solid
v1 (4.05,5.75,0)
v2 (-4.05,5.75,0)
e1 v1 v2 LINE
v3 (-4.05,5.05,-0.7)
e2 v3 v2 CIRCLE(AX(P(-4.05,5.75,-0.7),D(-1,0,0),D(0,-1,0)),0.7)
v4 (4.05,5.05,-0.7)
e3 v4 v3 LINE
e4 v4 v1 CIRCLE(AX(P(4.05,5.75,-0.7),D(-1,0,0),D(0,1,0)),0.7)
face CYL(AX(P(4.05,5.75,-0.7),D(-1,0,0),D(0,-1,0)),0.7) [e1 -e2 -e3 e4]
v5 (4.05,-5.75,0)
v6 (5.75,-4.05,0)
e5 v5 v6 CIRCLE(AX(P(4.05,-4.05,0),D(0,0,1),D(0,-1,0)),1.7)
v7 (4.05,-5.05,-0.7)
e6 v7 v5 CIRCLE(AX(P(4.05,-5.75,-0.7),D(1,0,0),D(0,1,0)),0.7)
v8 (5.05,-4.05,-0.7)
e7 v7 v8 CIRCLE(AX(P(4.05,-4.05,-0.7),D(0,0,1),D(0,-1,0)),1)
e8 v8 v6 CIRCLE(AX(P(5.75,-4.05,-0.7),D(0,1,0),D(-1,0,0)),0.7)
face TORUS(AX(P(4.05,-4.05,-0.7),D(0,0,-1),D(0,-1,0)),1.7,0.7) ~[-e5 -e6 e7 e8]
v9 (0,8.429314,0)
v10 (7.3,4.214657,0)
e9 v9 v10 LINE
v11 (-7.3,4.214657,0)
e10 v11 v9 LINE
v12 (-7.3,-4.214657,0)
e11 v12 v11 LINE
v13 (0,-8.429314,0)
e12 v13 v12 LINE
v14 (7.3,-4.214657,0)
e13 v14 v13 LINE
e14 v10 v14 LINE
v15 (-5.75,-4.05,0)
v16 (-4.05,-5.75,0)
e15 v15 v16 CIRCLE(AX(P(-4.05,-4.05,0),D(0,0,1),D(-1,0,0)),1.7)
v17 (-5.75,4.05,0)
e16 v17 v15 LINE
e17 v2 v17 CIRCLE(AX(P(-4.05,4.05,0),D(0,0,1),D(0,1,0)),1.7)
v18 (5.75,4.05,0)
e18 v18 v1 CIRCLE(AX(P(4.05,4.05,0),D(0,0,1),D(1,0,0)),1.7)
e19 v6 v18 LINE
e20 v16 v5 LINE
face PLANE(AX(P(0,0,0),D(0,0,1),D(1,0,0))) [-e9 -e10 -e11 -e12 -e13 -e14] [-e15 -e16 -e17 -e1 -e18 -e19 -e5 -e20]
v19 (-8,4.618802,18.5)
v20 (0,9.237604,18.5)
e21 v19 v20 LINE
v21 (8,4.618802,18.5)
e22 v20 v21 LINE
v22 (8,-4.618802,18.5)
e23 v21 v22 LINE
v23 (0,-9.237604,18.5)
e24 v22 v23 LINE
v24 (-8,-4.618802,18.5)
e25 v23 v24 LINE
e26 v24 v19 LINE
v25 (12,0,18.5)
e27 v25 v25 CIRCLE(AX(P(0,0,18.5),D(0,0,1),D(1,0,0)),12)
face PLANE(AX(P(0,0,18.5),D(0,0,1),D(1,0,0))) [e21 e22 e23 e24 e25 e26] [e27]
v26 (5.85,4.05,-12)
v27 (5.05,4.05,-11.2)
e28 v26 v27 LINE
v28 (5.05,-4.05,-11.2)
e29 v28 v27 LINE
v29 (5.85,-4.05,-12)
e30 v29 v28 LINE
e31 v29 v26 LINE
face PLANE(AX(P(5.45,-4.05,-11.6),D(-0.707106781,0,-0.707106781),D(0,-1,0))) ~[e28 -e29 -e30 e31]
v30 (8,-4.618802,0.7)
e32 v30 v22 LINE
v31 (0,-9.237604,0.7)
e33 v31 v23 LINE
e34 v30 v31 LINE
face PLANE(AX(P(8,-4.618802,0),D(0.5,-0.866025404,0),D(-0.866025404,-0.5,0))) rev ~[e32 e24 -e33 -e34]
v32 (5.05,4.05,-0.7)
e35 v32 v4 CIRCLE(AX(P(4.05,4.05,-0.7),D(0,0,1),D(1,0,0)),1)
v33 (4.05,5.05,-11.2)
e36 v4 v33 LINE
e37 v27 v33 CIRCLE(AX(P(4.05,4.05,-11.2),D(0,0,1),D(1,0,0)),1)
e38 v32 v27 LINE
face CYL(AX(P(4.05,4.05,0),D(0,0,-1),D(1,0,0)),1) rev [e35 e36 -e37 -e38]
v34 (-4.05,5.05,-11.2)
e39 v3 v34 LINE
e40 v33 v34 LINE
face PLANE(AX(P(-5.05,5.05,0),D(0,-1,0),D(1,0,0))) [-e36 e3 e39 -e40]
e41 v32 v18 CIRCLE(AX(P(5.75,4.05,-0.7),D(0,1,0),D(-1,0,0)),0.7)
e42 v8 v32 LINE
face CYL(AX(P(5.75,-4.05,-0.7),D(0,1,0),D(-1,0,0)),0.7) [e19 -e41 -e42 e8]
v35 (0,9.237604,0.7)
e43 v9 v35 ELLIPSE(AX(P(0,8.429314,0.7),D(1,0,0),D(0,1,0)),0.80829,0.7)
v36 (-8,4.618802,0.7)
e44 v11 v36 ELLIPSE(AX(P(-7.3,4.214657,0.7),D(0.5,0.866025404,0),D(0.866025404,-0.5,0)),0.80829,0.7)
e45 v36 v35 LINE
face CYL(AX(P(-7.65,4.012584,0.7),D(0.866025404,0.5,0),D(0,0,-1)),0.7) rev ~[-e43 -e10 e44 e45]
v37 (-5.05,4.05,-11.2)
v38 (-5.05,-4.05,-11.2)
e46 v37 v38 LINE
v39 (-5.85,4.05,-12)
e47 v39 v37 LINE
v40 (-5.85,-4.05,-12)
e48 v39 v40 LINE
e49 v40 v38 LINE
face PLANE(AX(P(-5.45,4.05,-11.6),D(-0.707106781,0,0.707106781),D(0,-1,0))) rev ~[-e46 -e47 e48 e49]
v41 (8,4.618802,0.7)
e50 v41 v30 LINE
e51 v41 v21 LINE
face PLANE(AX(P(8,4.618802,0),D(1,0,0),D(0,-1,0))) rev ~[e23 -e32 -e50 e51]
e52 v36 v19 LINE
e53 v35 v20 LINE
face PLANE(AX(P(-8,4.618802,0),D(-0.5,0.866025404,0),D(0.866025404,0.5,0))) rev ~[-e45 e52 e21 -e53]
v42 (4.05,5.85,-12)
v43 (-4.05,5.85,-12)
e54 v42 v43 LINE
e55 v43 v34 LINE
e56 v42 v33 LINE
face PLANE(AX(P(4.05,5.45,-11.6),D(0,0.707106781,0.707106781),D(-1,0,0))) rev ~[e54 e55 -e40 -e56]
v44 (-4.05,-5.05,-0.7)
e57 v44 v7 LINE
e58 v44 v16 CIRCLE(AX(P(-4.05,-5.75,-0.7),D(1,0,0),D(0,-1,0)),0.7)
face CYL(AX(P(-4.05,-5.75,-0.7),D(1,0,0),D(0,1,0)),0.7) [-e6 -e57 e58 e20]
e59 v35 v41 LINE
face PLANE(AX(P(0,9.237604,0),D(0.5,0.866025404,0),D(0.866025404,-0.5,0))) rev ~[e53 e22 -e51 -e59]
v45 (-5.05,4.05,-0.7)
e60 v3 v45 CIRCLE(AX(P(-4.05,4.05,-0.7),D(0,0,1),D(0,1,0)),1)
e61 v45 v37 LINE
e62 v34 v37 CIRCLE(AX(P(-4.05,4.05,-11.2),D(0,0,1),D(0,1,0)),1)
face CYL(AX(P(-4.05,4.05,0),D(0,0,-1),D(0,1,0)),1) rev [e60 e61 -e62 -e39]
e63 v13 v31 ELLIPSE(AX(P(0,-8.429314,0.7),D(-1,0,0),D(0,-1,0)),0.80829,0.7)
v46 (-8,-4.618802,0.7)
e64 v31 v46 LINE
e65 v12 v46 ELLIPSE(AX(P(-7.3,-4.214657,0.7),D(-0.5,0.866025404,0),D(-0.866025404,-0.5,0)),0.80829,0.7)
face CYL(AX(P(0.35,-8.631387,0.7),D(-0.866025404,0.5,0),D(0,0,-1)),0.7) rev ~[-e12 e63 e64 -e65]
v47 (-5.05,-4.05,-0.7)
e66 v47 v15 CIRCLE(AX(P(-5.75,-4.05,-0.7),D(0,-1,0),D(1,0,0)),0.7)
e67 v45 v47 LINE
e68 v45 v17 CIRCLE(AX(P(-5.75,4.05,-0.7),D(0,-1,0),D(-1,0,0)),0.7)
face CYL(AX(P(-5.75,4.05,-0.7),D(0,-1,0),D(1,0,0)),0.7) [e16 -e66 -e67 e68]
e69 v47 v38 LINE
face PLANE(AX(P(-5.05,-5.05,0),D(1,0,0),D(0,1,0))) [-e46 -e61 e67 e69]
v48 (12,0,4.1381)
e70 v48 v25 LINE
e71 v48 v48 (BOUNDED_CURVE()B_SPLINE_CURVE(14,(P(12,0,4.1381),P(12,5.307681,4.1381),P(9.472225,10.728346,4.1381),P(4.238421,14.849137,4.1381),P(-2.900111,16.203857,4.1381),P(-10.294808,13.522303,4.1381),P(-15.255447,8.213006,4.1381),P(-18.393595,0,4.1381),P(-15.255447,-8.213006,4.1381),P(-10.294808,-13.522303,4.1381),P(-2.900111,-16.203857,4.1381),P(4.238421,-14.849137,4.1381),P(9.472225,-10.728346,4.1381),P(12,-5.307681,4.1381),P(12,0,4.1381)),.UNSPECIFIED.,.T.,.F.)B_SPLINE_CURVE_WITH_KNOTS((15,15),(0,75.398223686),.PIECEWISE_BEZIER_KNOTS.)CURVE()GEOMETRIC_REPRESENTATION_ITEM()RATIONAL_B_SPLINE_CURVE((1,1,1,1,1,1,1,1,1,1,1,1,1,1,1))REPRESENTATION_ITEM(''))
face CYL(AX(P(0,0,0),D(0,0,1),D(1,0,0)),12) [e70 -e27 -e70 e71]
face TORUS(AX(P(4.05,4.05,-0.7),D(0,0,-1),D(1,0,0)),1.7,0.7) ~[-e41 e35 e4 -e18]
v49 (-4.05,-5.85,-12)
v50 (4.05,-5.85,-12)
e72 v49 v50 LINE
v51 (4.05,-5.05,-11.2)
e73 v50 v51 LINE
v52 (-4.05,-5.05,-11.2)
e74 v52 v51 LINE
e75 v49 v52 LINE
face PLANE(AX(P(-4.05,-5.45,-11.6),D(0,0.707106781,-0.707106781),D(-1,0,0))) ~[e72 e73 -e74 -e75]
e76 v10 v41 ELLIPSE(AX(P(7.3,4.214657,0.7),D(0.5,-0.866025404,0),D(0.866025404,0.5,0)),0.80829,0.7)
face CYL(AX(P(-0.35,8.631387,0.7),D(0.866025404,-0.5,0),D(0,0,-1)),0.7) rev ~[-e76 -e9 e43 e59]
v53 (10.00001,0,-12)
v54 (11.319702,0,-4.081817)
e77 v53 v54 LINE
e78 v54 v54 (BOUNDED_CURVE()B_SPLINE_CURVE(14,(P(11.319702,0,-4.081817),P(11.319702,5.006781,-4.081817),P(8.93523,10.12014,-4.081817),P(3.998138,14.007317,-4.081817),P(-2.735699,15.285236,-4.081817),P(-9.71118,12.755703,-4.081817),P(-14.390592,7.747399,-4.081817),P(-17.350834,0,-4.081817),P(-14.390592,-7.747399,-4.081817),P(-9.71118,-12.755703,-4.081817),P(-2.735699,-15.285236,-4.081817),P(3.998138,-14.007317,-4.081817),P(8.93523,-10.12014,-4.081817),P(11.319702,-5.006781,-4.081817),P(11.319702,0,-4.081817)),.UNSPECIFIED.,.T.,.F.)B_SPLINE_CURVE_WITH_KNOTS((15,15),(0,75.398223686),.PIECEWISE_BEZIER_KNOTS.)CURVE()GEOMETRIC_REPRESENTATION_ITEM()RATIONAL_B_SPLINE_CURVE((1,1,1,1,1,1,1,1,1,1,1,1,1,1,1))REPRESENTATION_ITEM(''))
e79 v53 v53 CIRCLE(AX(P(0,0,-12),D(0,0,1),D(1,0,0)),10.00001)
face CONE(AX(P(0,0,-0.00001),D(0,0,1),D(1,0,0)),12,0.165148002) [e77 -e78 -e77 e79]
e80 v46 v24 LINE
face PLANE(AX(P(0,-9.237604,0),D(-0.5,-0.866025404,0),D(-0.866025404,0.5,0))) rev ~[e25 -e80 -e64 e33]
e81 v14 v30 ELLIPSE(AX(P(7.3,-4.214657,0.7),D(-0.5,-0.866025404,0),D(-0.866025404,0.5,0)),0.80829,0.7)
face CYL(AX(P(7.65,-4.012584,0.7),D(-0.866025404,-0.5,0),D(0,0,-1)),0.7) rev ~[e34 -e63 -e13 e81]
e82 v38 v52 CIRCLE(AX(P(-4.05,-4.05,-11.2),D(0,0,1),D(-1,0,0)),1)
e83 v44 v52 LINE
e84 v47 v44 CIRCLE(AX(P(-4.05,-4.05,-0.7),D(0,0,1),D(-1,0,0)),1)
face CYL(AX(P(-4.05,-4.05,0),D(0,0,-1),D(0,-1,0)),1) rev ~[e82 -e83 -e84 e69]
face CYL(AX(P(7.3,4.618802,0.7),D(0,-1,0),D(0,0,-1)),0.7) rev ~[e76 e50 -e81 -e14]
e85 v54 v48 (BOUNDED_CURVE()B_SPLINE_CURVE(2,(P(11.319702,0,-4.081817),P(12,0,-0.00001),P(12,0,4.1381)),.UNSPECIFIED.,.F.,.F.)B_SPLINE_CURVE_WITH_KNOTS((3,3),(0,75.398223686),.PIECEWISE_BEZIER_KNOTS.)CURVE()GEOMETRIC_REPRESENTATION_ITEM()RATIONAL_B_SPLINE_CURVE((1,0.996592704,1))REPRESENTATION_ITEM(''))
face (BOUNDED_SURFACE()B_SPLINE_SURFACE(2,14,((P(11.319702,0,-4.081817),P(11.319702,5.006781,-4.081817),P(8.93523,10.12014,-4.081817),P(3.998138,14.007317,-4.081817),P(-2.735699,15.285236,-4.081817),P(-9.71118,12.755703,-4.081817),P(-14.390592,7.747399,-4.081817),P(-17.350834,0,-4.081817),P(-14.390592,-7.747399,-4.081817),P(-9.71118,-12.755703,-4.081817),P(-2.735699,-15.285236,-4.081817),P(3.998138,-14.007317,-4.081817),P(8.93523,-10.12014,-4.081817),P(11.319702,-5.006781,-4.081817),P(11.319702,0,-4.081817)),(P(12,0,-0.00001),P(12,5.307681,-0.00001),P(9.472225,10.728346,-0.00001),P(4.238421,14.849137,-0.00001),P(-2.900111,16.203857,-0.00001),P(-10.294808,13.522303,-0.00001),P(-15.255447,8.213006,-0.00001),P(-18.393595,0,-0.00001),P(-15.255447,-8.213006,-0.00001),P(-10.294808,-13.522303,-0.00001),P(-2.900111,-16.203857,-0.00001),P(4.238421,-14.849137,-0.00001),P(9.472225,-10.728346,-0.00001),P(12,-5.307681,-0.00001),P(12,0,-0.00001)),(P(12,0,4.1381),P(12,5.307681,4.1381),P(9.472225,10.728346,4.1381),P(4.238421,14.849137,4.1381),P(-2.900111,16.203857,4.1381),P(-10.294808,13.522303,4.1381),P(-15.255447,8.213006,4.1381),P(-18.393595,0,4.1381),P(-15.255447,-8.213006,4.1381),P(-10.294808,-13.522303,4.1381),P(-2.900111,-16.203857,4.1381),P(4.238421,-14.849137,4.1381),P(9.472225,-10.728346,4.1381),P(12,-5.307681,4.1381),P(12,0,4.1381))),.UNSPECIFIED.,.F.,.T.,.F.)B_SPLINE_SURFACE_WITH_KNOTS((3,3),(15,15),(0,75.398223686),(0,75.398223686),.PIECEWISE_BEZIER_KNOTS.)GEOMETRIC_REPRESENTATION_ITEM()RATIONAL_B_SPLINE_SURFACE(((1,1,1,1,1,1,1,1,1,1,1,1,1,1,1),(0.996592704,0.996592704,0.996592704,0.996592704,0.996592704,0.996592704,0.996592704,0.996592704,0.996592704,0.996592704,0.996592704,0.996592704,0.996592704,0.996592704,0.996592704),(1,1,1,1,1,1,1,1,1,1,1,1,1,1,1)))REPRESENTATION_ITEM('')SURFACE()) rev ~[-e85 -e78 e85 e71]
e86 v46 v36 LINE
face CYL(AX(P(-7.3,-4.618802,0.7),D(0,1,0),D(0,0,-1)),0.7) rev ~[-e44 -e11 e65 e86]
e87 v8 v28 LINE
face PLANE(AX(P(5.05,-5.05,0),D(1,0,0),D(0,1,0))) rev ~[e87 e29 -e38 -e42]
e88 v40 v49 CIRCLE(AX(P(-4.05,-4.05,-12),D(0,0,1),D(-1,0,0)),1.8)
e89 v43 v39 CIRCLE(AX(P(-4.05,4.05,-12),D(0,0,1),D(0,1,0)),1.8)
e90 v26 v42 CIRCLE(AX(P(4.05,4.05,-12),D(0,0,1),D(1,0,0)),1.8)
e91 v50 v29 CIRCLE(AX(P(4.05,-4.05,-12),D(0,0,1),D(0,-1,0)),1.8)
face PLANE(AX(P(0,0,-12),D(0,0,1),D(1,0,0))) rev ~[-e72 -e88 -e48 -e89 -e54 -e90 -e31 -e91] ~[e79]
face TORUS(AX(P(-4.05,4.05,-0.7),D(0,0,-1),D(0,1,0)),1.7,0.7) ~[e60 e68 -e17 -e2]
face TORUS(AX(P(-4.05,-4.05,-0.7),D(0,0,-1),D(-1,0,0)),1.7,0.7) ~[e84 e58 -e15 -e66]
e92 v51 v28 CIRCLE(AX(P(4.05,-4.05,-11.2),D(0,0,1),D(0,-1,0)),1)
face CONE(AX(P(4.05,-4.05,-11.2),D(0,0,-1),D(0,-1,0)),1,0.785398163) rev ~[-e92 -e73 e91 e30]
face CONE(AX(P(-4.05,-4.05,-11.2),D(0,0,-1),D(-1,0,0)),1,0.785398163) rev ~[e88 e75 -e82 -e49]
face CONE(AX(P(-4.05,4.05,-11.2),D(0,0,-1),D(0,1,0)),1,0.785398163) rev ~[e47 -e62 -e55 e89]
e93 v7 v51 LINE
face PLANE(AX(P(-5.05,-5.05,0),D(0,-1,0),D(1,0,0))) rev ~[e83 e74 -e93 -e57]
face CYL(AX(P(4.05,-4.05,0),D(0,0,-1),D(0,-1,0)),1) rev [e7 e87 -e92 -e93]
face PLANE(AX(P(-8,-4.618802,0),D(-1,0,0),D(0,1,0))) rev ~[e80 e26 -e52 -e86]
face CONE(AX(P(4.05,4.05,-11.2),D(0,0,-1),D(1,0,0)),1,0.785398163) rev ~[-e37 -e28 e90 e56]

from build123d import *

# Parameters (mm, degrees)
F0_R     = 12
F1_DEPTH = 18.5
F0_W     = 10.1
F0_H     = 10.1
F2_DEPTH = 12
F3_SIZE2 = 11.99999
F3_SIZE  = 1.99999
F4_R     = 1
F5_R     = 0.7
F6_R     = 50
F7_SIZE  = 0.8


# Not quite as in the source:
# - a fillet or chamfer is up to 0.001 mm smaller than in the source, because OpenCascade refuses the exact size


with BuildPart() as f1:
    # F0 (on Top) → F1 (new body)
    with BuildSketch(Plane.XY):
        Circle(F0_R)
        Polygon((0, 9.237604307), (8, 4.6188021535), (8, -4.6188021535), (0, -9.237604307), (-8, -4.6188021535), (-8, 4.6188021535), align=None, mode=Mode.SUBTRACT)
    extrude(amount=F1_DEPTH)

    # F0 (on Top) → F2 (join)
    with BuildSketch(Plane.XY):
        Circle(F0_R)
        Polygon((0, 9.237604307), (8, 4.6188021535), (8, -4.6188021535), (0, -9.237604307), (-8, -4.6188021535), (-8, 4.6188021535), align=None, mode=Mode.SUBTRACT)
        Polygon((8, -4.6188021535), (8, 4.6188021535), (0, 9.237604307), (-8, 4.6188021535), (-8, -4.6188021535), (0, -9.237604307), align=None)
        Rectangle(F0_W, F0_H, mode=Mode.SUBTRACT)
    extrude(amount=-F2_DEPTH)

    # F3 (size 2 and 12 in the source; OpenCascade refuses exactly that, so slightly less here)
    f3_edges = [f1.edges().sort_by_distance(p)[0] for p in [
        (-12, 0, -12),
    ]]
    f3_side = f1.faces().sort_by_distance((5.389411, 0, -12))[0]
    chamfer(f3_edges, length=F3_SIZE, length2=F3_SIZE2, reference=f3_side)

    # F4
    f4_edges = [f1.edges().sort_by_distance(p)[0] for p in [
        (-5.05, 5.05, -6),
        (5.05, 5.05, -6),
        (5.05, -5.05, -6),
        (-5.05, -5.05, -6),
    ]]
    fillet(f4_edges, radius=F4_R)

    # F5
    f5_edges = [f1.edges().sort_by_distance(p)[0] for p in [
        (4, -6.928203, 0),
        (-4, -6.928203, 0),
        (5.05, 0, 0),
        (4.757107, 4.757107, 0),
        (4.757107, -4.757107, 0),
        (0, 5.05, 0),
        (0, -5.05, 0),
        (-4.757107, 4.757107, 0),
        (-4.757107, -4.757107, 0),
        (-5.05, 0, 0),
        (-4, 6.928203, 0),
        (4, 6.928203, 0),
        (8, 0, 0),
        (-8, 0, 0),
    ]]
    fillet(f5_edges, radius=F5_R)

    # F6
    f6_edges = [f1.edges().sort_by_distance(p)[0] for p in [
        (-12, 0, -1e-05),
        (-12, 0, 0),
    ]]
    fillet(f6_edges, radius=F6_R)

    # F7
    f7_edges = [f1.edges().sort_by_distance(p)[0] for p in [
        (5.05, 0, -12),
    ]]
    chamfer(f7_edges, length=F7_SIZE)


solid = f1.part
